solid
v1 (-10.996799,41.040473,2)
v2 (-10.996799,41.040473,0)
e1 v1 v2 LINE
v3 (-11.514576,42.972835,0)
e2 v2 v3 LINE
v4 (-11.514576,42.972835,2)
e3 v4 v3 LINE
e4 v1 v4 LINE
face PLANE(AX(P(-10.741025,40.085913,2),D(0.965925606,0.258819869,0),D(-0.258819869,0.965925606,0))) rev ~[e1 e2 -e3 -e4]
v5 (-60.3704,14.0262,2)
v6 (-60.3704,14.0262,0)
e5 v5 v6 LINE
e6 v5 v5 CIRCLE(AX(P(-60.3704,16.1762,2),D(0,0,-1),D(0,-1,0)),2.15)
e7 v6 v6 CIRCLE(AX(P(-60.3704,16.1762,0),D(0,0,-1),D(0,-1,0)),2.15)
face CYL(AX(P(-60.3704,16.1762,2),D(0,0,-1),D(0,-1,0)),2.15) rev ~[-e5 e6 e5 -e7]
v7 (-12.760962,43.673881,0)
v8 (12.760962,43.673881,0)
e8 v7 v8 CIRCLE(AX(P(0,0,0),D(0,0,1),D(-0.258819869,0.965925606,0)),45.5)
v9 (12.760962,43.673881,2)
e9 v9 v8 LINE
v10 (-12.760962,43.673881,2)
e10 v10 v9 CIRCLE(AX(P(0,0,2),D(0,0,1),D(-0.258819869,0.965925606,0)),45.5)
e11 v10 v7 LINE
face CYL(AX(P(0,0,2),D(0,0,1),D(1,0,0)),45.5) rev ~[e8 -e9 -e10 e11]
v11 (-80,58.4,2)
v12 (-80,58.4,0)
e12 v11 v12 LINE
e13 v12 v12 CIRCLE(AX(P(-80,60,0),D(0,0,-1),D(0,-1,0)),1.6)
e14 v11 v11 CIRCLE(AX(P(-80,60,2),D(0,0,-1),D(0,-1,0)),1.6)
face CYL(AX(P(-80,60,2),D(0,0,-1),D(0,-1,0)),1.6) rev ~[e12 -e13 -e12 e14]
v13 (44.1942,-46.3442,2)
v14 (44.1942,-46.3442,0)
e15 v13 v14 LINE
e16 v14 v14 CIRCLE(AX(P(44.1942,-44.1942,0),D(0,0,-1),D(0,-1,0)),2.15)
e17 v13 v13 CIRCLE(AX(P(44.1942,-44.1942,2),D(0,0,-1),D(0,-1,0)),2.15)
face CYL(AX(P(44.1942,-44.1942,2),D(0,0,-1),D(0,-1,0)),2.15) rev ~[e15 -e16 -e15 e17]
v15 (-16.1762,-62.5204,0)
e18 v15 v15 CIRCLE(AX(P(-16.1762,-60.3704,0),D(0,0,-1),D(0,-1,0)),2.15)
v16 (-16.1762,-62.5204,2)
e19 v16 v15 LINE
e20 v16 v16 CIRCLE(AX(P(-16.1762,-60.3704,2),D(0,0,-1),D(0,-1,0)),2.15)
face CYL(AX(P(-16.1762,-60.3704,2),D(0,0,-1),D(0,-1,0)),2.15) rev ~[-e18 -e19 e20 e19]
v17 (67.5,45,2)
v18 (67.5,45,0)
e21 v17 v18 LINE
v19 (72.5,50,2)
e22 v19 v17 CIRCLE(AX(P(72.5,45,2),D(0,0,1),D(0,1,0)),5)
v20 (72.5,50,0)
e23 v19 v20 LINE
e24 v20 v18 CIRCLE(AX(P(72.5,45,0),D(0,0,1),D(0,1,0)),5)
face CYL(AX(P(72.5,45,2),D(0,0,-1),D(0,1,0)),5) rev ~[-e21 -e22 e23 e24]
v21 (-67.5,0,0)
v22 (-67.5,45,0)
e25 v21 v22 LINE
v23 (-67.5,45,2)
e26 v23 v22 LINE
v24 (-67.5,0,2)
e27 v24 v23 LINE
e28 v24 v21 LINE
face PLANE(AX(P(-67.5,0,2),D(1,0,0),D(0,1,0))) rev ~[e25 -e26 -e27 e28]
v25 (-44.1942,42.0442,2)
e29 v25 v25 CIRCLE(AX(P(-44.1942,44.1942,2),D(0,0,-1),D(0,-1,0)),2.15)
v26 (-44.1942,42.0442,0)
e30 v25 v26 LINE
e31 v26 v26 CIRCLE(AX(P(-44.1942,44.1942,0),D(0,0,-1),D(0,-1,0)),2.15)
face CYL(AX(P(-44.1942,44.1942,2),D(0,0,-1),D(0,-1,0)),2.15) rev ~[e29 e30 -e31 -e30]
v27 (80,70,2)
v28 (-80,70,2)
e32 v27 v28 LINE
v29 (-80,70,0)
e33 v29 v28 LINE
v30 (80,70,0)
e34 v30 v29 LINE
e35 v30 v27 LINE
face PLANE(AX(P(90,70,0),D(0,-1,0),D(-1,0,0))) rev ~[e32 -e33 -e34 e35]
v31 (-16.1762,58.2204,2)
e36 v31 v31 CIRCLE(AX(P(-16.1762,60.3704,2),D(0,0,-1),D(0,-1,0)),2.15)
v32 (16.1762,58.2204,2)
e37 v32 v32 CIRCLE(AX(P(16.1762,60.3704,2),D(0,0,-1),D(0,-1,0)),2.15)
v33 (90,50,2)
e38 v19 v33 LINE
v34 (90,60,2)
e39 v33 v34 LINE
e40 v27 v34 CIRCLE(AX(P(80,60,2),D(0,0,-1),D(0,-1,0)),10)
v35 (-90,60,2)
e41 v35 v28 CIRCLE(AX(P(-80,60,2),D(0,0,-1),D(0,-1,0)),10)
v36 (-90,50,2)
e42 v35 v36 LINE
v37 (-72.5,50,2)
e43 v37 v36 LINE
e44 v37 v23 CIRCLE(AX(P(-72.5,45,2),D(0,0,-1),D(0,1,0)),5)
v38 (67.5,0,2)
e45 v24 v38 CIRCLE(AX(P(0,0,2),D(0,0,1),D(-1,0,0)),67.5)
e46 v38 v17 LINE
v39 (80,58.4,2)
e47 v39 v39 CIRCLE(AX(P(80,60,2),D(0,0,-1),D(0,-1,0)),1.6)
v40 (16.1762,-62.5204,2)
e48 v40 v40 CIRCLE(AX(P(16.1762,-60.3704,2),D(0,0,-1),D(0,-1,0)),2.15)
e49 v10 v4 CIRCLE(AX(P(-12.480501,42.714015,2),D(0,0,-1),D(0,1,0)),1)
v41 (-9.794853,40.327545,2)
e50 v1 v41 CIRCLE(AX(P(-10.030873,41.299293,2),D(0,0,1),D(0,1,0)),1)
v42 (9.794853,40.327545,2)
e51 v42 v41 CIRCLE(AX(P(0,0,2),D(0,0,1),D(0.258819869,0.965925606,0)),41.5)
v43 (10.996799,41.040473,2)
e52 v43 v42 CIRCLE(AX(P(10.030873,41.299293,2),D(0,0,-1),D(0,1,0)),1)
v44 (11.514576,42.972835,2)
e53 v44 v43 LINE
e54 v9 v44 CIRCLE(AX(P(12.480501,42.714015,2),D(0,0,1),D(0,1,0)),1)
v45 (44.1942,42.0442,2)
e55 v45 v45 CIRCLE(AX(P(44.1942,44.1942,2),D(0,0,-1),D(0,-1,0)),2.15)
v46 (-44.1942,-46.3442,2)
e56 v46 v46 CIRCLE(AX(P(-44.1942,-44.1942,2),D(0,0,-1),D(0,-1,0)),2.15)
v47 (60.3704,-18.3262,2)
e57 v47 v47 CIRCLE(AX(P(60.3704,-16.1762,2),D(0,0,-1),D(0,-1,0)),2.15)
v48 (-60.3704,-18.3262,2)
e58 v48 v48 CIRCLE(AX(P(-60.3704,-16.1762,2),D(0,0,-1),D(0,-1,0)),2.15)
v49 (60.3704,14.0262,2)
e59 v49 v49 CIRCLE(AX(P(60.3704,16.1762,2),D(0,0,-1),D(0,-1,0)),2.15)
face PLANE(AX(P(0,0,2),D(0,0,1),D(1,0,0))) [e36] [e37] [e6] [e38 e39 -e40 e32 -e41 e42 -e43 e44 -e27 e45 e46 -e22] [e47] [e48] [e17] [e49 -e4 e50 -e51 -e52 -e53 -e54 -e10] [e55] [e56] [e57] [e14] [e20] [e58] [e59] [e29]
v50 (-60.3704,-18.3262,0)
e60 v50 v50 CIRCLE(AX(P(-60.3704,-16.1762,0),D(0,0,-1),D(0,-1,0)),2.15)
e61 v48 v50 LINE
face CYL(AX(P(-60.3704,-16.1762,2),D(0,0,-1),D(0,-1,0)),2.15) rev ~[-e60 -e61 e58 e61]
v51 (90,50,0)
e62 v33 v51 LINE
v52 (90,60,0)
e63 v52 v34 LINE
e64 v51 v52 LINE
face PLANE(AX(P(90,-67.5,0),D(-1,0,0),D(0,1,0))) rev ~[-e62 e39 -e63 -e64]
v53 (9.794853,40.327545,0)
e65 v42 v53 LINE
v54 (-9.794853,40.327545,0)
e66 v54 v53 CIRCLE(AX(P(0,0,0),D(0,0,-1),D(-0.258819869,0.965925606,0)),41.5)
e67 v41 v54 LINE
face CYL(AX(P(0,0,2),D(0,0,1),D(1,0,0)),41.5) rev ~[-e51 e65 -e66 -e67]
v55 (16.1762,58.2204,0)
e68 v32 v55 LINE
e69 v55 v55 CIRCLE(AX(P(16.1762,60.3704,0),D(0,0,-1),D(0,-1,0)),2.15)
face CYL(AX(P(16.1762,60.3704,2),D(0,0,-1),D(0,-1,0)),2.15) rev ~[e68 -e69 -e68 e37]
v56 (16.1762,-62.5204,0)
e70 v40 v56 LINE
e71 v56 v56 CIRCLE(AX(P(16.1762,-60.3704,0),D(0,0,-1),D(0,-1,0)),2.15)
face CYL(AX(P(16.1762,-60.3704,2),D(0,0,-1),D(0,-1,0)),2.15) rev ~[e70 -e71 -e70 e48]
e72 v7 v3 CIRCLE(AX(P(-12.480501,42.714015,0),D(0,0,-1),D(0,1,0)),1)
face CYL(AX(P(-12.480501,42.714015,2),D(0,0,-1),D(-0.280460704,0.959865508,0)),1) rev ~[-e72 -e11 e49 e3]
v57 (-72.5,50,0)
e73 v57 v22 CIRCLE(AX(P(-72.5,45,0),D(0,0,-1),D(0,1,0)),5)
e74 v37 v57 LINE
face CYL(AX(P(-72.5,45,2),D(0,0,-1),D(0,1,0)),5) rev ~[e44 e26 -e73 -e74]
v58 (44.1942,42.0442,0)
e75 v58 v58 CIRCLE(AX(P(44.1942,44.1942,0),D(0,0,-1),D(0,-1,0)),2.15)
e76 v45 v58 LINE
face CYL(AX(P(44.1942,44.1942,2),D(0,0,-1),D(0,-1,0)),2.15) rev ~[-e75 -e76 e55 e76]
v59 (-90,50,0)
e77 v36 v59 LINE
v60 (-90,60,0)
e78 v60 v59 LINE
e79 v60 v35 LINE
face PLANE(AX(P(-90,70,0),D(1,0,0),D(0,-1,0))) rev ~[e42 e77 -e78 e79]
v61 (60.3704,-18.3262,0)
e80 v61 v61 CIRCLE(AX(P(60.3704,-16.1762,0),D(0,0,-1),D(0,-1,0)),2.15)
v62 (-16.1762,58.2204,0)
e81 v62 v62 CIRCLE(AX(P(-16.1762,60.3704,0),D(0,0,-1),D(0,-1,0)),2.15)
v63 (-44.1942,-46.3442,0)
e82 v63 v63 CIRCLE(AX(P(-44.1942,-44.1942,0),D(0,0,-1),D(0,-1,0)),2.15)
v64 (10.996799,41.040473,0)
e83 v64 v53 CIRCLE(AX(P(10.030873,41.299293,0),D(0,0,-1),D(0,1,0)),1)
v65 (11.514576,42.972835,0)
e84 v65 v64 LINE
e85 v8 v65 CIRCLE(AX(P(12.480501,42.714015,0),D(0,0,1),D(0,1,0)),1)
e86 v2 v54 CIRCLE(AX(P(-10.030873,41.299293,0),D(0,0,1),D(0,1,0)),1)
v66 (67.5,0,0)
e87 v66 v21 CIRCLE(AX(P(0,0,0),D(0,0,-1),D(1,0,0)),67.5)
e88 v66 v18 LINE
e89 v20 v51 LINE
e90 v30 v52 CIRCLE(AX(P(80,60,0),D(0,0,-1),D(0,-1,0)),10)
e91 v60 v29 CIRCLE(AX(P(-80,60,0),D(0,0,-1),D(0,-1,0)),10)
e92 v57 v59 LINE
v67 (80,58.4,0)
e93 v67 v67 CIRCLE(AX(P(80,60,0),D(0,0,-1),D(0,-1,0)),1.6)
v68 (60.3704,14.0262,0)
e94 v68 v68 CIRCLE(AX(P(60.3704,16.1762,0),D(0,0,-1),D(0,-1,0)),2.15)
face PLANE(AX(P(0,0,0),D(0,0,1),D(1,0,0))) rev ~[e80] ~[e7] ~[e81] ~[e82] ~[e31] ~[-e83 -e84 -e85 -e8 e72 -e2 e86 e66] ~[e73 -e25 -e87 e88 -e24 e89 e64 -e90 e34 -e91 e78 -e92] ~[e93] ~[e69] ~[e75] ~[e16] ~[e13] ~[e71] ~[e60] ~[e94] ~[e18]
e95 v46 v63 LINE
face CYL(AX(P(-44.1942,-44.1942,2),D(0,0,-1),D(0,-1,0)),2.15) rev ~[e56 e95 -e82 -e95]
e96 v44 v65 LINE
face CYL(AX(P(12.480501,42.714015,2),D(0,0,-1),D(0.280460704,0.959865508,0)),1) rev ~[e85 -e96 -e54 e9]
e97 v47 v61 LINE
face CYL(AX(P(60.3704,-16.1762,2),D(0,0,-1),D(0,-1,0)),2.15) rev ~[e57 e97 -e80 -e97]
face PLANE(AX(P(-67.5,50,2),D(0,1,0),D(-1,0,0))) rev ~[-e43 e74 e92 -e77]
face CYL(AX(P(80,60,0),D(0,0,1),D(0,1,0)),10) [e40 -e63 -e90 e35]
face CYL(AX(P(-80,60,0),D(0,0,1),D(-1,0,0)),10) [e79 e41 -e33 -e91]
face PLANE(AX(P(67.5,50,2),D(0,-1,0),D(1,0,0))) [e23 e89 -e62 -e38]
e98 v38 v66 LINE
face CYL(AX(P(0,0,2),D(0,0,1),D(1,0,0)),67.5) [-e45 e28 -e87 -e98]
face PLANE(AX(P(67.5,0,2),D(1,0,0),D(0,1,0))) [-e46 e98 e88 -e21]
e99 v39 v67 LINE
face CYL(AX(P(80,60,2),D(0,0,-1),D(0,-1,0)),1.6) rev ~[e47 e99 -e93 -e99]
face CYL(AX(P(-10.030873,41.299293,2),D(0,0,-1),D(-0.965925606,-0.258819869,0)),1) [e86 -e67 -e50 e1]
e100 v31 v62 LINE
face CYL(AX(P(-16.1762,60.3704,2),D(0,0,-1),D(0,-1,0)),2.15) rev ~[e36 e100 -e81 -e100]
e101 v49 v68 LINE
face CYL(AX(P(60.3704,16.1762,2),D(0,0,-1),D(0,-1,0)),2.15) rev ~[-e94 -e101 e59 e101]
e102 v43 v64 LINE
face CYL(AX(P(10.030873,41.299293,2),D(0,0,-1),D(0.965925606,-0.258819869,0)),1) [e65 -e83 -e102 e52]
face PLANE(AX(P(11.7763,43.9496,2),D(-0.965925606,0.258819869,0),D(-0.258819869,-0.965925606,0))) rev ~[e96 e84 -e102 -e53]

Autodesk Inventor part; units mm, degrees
ref_plane "YZ Plane" through (0, 0, 0) normal (1, 0, 0) x (0, 1, 0)
ref_plane "XZ Plane" through (0, 0, 0) normal (0, 1, 0) x (-1, 0, 0)
ref_plane "XY Plane" through (0, 0, 0) normal (0, 0, 1) x (1, 0, 0)
sketch "スケッチ1" plane through (0, 0, 0) normal (0, 0, 1) x (1, 0, 0)
  line L0 (-90, -67.5) -> (90, -67.5)
  line L1 (90, -67.5) -> (90, 70)
  line L2 (90, 70) -> (-90, 70)
  line L3 (-90, 70) -> (-90, -67.5)
  point P0 (0, 0)
  point P1 (-29.0861, -67.5)
  dimension "d37" = 90
  dimension "d38" = 70
  dimension "d40" = 90
  dimension "d41" = 67.5
extrude "プレート1" add sketch "スケッチ1" along normal blind 2
sketch "スケッチ2" plane through (0, 0, 2) normal (0, 0, 1) x (1, 0, 0)
  circle A0 centre (0, 0) radius 45.5
  dimension "d5" = 91
extrude "押し出し1" cut sketch "スケッチ2" against normal blind 10
sketch "スケッチ3" plane through (0, 0, 2) normal (0, 0, 1) x (1, 0, 0)
  circle A0 centre (0, 0) radius 62.5
  point P0 (-16.1762, 60.3704)
  point P1 (-44.1942, 44.1942)
  point P2 (-60.3704, 16.1762)
  point P3 (-60.3704, -16.1762)
  point P4 (-44.1942, -44.1942)
  point P5 (-16.1762, -60.3704)
  point P6 (16.1762, -60.3704)
  point P7 (44.1942, -44.1942)
  point P8 (60.3704, -16.1762)
  point P9 (60.3704, 16.1762)
  point P10 (44.1942, 44.1942)
  point P11 (16.1762, 60.3704)
  dimension "d8" = 125
  dimension "d11" = 360
  dimension "d20" = 0
hole "穴1" at (-16.1762, 60.3704, 2) at (-44.1942, 44.1942, 2) at (-60.3704, 16.1762, 2) at (-60.3704, -16.1762, 2) at (-44.1942, -44.1942, 2) at (-16.1762, -60.3704, 2) at (16.1762, -60.3704, 2) at (44.1942, -44.1942, 2) at (60.3704, -16.1762, 2) at (60.3704, 16.1762, 2) at (44.1942, 44.1942, 2) at (16.1762, 60.3704, 2) direction (0, 0, -1) diameter 4.3 end through all clearance for "Flat Head Machine Screw" size "M4" standard "Ansi Metric M Profile"
fillet "コーナーR2" radius 10 2 edges at (-90, 70, 1) (90, 70, 1)
sketch "スケッチ5" plane through (0, 0, 2) normal (0, 0, 1) x (1, 0, 0)
  arc A0 (-80, 70) -> (-90, 60) centre (-80, 60) ccw projected
  arc A1 (90, 60) -> (80, 70) centre (80, 60) ccw projected
  point P0 (0, 0)
hole "穴2" at (-80, 60, 2) at (80, 60, 2) direction (0, 0, -1) diameter 3.2 end through all clearance for "Socket Head Cap Screw" size "M3" standard "Ansi Metric M Profile"
sketch "スケッチ7" plane through (0, 0, 2) normal (0, 0, 1) x (1, 0, 0)
  circle A0 centre (0, 0) radius 45.5 projected
  circle A1 centre (0, 0) radius 67.5
  line L0 (90, -67.5) -> (-90, -67.5) projected
  line L1 (-90, -67.5) -> (-90, 60) projected
  line L2 (-90, -67.5) -> (-67.5, -67.5)
  line L3 (-67.5, -67.5) -> (-67.5, 50)
  line L4 (-67.5, 50) -> (-90, 50)
  line L5 (-90, 50) -> (-90, -67.5)
  line L6 (90, -67.5) -> (67.5, -67.5)
  line L7 (67.5, -67.5) -> (67.5, 50)
  line L8 (67.5, 50) -> (90, 50)
  line L9 (90, 50) -> (90, -67.5)
  line L10 (-80, 70) -> (80, 70) projected
  point P0 (67.5, 0)
  point P1 (0, -67.5)
  point P2 (-67.5, 0)
  dimension "d56" = 20
  dimension "d57" = 20
extrude "押し出し4" cut sketch "スケッチ7" against normal blind 10 contours L7 L0 A1 | L7 L8 L9 L0 | A1 L0 L3 | L3 L0 L1 L4
fillet "コーナーR4" radius 5 2 edges at (-67.5, 50, 1) (67.5, 50, 1)
sketch "スケッチ9" plane through (0, 0, 2) normal (0, 0, 1) x (1, 0, 0)
  circle A0 centre (0, 0) radius 45.5 projected
  circle A1 centre (0, 0) radius 41.5
  line L0 (0, 0) -> (-11.7763, 43.9496)
  line L1 (11.7763, 43.9496) -> (0, 0)
  line L2 (0, 97.5) -> (0, -95) projected
  point P0 (-10.741, 40.0859)
  point P1 (10.741, 40.0859)
  dimension "d76" = 4
  dimension "d77" = 15
  dimension "d78" = 15
extrude "押し出し5" add sketch "スケッチ9" against normal up to surface (2 mm away) contours L1 A1 L2 A0 | L2 A1 L0 A0 picked at (5.1612, 43.8259) picked at (-6.3577, 43.6684)
fillet "コーナーR5" radius 1 4 edges at (10.741, 40.0859, 1) (-10.741, 40.0859, 1) (-11.7763, 43.9496, 1) (11.7763, 43.9496, 1)
equation "\"d40\" = d37"
equation "\"d18\" = Thickness"
equation "\"d47\" = Thickness"
equation "\"d2\" = Thickness"
equation "\"BendRadius\" = Thickness"
equation "\"BendReliefWidth\" = Thickness"
equation "\"BendReliefDepth\" = 0.5 * Thickness"
equation "\"CornerReliefSize\" = 4 * Thickness"
equation "\"MinimumRemnant\" = 2 * Thickness"
equation "\"TransitionRadius\" = BendRadius"
equation "\"JacobiRadiusSize\" = BendRadius"
equation "\"GapSize\" = Thickness"
equation "\"Thickness\" = 2"
properties part number "base4" material "CFRP"
